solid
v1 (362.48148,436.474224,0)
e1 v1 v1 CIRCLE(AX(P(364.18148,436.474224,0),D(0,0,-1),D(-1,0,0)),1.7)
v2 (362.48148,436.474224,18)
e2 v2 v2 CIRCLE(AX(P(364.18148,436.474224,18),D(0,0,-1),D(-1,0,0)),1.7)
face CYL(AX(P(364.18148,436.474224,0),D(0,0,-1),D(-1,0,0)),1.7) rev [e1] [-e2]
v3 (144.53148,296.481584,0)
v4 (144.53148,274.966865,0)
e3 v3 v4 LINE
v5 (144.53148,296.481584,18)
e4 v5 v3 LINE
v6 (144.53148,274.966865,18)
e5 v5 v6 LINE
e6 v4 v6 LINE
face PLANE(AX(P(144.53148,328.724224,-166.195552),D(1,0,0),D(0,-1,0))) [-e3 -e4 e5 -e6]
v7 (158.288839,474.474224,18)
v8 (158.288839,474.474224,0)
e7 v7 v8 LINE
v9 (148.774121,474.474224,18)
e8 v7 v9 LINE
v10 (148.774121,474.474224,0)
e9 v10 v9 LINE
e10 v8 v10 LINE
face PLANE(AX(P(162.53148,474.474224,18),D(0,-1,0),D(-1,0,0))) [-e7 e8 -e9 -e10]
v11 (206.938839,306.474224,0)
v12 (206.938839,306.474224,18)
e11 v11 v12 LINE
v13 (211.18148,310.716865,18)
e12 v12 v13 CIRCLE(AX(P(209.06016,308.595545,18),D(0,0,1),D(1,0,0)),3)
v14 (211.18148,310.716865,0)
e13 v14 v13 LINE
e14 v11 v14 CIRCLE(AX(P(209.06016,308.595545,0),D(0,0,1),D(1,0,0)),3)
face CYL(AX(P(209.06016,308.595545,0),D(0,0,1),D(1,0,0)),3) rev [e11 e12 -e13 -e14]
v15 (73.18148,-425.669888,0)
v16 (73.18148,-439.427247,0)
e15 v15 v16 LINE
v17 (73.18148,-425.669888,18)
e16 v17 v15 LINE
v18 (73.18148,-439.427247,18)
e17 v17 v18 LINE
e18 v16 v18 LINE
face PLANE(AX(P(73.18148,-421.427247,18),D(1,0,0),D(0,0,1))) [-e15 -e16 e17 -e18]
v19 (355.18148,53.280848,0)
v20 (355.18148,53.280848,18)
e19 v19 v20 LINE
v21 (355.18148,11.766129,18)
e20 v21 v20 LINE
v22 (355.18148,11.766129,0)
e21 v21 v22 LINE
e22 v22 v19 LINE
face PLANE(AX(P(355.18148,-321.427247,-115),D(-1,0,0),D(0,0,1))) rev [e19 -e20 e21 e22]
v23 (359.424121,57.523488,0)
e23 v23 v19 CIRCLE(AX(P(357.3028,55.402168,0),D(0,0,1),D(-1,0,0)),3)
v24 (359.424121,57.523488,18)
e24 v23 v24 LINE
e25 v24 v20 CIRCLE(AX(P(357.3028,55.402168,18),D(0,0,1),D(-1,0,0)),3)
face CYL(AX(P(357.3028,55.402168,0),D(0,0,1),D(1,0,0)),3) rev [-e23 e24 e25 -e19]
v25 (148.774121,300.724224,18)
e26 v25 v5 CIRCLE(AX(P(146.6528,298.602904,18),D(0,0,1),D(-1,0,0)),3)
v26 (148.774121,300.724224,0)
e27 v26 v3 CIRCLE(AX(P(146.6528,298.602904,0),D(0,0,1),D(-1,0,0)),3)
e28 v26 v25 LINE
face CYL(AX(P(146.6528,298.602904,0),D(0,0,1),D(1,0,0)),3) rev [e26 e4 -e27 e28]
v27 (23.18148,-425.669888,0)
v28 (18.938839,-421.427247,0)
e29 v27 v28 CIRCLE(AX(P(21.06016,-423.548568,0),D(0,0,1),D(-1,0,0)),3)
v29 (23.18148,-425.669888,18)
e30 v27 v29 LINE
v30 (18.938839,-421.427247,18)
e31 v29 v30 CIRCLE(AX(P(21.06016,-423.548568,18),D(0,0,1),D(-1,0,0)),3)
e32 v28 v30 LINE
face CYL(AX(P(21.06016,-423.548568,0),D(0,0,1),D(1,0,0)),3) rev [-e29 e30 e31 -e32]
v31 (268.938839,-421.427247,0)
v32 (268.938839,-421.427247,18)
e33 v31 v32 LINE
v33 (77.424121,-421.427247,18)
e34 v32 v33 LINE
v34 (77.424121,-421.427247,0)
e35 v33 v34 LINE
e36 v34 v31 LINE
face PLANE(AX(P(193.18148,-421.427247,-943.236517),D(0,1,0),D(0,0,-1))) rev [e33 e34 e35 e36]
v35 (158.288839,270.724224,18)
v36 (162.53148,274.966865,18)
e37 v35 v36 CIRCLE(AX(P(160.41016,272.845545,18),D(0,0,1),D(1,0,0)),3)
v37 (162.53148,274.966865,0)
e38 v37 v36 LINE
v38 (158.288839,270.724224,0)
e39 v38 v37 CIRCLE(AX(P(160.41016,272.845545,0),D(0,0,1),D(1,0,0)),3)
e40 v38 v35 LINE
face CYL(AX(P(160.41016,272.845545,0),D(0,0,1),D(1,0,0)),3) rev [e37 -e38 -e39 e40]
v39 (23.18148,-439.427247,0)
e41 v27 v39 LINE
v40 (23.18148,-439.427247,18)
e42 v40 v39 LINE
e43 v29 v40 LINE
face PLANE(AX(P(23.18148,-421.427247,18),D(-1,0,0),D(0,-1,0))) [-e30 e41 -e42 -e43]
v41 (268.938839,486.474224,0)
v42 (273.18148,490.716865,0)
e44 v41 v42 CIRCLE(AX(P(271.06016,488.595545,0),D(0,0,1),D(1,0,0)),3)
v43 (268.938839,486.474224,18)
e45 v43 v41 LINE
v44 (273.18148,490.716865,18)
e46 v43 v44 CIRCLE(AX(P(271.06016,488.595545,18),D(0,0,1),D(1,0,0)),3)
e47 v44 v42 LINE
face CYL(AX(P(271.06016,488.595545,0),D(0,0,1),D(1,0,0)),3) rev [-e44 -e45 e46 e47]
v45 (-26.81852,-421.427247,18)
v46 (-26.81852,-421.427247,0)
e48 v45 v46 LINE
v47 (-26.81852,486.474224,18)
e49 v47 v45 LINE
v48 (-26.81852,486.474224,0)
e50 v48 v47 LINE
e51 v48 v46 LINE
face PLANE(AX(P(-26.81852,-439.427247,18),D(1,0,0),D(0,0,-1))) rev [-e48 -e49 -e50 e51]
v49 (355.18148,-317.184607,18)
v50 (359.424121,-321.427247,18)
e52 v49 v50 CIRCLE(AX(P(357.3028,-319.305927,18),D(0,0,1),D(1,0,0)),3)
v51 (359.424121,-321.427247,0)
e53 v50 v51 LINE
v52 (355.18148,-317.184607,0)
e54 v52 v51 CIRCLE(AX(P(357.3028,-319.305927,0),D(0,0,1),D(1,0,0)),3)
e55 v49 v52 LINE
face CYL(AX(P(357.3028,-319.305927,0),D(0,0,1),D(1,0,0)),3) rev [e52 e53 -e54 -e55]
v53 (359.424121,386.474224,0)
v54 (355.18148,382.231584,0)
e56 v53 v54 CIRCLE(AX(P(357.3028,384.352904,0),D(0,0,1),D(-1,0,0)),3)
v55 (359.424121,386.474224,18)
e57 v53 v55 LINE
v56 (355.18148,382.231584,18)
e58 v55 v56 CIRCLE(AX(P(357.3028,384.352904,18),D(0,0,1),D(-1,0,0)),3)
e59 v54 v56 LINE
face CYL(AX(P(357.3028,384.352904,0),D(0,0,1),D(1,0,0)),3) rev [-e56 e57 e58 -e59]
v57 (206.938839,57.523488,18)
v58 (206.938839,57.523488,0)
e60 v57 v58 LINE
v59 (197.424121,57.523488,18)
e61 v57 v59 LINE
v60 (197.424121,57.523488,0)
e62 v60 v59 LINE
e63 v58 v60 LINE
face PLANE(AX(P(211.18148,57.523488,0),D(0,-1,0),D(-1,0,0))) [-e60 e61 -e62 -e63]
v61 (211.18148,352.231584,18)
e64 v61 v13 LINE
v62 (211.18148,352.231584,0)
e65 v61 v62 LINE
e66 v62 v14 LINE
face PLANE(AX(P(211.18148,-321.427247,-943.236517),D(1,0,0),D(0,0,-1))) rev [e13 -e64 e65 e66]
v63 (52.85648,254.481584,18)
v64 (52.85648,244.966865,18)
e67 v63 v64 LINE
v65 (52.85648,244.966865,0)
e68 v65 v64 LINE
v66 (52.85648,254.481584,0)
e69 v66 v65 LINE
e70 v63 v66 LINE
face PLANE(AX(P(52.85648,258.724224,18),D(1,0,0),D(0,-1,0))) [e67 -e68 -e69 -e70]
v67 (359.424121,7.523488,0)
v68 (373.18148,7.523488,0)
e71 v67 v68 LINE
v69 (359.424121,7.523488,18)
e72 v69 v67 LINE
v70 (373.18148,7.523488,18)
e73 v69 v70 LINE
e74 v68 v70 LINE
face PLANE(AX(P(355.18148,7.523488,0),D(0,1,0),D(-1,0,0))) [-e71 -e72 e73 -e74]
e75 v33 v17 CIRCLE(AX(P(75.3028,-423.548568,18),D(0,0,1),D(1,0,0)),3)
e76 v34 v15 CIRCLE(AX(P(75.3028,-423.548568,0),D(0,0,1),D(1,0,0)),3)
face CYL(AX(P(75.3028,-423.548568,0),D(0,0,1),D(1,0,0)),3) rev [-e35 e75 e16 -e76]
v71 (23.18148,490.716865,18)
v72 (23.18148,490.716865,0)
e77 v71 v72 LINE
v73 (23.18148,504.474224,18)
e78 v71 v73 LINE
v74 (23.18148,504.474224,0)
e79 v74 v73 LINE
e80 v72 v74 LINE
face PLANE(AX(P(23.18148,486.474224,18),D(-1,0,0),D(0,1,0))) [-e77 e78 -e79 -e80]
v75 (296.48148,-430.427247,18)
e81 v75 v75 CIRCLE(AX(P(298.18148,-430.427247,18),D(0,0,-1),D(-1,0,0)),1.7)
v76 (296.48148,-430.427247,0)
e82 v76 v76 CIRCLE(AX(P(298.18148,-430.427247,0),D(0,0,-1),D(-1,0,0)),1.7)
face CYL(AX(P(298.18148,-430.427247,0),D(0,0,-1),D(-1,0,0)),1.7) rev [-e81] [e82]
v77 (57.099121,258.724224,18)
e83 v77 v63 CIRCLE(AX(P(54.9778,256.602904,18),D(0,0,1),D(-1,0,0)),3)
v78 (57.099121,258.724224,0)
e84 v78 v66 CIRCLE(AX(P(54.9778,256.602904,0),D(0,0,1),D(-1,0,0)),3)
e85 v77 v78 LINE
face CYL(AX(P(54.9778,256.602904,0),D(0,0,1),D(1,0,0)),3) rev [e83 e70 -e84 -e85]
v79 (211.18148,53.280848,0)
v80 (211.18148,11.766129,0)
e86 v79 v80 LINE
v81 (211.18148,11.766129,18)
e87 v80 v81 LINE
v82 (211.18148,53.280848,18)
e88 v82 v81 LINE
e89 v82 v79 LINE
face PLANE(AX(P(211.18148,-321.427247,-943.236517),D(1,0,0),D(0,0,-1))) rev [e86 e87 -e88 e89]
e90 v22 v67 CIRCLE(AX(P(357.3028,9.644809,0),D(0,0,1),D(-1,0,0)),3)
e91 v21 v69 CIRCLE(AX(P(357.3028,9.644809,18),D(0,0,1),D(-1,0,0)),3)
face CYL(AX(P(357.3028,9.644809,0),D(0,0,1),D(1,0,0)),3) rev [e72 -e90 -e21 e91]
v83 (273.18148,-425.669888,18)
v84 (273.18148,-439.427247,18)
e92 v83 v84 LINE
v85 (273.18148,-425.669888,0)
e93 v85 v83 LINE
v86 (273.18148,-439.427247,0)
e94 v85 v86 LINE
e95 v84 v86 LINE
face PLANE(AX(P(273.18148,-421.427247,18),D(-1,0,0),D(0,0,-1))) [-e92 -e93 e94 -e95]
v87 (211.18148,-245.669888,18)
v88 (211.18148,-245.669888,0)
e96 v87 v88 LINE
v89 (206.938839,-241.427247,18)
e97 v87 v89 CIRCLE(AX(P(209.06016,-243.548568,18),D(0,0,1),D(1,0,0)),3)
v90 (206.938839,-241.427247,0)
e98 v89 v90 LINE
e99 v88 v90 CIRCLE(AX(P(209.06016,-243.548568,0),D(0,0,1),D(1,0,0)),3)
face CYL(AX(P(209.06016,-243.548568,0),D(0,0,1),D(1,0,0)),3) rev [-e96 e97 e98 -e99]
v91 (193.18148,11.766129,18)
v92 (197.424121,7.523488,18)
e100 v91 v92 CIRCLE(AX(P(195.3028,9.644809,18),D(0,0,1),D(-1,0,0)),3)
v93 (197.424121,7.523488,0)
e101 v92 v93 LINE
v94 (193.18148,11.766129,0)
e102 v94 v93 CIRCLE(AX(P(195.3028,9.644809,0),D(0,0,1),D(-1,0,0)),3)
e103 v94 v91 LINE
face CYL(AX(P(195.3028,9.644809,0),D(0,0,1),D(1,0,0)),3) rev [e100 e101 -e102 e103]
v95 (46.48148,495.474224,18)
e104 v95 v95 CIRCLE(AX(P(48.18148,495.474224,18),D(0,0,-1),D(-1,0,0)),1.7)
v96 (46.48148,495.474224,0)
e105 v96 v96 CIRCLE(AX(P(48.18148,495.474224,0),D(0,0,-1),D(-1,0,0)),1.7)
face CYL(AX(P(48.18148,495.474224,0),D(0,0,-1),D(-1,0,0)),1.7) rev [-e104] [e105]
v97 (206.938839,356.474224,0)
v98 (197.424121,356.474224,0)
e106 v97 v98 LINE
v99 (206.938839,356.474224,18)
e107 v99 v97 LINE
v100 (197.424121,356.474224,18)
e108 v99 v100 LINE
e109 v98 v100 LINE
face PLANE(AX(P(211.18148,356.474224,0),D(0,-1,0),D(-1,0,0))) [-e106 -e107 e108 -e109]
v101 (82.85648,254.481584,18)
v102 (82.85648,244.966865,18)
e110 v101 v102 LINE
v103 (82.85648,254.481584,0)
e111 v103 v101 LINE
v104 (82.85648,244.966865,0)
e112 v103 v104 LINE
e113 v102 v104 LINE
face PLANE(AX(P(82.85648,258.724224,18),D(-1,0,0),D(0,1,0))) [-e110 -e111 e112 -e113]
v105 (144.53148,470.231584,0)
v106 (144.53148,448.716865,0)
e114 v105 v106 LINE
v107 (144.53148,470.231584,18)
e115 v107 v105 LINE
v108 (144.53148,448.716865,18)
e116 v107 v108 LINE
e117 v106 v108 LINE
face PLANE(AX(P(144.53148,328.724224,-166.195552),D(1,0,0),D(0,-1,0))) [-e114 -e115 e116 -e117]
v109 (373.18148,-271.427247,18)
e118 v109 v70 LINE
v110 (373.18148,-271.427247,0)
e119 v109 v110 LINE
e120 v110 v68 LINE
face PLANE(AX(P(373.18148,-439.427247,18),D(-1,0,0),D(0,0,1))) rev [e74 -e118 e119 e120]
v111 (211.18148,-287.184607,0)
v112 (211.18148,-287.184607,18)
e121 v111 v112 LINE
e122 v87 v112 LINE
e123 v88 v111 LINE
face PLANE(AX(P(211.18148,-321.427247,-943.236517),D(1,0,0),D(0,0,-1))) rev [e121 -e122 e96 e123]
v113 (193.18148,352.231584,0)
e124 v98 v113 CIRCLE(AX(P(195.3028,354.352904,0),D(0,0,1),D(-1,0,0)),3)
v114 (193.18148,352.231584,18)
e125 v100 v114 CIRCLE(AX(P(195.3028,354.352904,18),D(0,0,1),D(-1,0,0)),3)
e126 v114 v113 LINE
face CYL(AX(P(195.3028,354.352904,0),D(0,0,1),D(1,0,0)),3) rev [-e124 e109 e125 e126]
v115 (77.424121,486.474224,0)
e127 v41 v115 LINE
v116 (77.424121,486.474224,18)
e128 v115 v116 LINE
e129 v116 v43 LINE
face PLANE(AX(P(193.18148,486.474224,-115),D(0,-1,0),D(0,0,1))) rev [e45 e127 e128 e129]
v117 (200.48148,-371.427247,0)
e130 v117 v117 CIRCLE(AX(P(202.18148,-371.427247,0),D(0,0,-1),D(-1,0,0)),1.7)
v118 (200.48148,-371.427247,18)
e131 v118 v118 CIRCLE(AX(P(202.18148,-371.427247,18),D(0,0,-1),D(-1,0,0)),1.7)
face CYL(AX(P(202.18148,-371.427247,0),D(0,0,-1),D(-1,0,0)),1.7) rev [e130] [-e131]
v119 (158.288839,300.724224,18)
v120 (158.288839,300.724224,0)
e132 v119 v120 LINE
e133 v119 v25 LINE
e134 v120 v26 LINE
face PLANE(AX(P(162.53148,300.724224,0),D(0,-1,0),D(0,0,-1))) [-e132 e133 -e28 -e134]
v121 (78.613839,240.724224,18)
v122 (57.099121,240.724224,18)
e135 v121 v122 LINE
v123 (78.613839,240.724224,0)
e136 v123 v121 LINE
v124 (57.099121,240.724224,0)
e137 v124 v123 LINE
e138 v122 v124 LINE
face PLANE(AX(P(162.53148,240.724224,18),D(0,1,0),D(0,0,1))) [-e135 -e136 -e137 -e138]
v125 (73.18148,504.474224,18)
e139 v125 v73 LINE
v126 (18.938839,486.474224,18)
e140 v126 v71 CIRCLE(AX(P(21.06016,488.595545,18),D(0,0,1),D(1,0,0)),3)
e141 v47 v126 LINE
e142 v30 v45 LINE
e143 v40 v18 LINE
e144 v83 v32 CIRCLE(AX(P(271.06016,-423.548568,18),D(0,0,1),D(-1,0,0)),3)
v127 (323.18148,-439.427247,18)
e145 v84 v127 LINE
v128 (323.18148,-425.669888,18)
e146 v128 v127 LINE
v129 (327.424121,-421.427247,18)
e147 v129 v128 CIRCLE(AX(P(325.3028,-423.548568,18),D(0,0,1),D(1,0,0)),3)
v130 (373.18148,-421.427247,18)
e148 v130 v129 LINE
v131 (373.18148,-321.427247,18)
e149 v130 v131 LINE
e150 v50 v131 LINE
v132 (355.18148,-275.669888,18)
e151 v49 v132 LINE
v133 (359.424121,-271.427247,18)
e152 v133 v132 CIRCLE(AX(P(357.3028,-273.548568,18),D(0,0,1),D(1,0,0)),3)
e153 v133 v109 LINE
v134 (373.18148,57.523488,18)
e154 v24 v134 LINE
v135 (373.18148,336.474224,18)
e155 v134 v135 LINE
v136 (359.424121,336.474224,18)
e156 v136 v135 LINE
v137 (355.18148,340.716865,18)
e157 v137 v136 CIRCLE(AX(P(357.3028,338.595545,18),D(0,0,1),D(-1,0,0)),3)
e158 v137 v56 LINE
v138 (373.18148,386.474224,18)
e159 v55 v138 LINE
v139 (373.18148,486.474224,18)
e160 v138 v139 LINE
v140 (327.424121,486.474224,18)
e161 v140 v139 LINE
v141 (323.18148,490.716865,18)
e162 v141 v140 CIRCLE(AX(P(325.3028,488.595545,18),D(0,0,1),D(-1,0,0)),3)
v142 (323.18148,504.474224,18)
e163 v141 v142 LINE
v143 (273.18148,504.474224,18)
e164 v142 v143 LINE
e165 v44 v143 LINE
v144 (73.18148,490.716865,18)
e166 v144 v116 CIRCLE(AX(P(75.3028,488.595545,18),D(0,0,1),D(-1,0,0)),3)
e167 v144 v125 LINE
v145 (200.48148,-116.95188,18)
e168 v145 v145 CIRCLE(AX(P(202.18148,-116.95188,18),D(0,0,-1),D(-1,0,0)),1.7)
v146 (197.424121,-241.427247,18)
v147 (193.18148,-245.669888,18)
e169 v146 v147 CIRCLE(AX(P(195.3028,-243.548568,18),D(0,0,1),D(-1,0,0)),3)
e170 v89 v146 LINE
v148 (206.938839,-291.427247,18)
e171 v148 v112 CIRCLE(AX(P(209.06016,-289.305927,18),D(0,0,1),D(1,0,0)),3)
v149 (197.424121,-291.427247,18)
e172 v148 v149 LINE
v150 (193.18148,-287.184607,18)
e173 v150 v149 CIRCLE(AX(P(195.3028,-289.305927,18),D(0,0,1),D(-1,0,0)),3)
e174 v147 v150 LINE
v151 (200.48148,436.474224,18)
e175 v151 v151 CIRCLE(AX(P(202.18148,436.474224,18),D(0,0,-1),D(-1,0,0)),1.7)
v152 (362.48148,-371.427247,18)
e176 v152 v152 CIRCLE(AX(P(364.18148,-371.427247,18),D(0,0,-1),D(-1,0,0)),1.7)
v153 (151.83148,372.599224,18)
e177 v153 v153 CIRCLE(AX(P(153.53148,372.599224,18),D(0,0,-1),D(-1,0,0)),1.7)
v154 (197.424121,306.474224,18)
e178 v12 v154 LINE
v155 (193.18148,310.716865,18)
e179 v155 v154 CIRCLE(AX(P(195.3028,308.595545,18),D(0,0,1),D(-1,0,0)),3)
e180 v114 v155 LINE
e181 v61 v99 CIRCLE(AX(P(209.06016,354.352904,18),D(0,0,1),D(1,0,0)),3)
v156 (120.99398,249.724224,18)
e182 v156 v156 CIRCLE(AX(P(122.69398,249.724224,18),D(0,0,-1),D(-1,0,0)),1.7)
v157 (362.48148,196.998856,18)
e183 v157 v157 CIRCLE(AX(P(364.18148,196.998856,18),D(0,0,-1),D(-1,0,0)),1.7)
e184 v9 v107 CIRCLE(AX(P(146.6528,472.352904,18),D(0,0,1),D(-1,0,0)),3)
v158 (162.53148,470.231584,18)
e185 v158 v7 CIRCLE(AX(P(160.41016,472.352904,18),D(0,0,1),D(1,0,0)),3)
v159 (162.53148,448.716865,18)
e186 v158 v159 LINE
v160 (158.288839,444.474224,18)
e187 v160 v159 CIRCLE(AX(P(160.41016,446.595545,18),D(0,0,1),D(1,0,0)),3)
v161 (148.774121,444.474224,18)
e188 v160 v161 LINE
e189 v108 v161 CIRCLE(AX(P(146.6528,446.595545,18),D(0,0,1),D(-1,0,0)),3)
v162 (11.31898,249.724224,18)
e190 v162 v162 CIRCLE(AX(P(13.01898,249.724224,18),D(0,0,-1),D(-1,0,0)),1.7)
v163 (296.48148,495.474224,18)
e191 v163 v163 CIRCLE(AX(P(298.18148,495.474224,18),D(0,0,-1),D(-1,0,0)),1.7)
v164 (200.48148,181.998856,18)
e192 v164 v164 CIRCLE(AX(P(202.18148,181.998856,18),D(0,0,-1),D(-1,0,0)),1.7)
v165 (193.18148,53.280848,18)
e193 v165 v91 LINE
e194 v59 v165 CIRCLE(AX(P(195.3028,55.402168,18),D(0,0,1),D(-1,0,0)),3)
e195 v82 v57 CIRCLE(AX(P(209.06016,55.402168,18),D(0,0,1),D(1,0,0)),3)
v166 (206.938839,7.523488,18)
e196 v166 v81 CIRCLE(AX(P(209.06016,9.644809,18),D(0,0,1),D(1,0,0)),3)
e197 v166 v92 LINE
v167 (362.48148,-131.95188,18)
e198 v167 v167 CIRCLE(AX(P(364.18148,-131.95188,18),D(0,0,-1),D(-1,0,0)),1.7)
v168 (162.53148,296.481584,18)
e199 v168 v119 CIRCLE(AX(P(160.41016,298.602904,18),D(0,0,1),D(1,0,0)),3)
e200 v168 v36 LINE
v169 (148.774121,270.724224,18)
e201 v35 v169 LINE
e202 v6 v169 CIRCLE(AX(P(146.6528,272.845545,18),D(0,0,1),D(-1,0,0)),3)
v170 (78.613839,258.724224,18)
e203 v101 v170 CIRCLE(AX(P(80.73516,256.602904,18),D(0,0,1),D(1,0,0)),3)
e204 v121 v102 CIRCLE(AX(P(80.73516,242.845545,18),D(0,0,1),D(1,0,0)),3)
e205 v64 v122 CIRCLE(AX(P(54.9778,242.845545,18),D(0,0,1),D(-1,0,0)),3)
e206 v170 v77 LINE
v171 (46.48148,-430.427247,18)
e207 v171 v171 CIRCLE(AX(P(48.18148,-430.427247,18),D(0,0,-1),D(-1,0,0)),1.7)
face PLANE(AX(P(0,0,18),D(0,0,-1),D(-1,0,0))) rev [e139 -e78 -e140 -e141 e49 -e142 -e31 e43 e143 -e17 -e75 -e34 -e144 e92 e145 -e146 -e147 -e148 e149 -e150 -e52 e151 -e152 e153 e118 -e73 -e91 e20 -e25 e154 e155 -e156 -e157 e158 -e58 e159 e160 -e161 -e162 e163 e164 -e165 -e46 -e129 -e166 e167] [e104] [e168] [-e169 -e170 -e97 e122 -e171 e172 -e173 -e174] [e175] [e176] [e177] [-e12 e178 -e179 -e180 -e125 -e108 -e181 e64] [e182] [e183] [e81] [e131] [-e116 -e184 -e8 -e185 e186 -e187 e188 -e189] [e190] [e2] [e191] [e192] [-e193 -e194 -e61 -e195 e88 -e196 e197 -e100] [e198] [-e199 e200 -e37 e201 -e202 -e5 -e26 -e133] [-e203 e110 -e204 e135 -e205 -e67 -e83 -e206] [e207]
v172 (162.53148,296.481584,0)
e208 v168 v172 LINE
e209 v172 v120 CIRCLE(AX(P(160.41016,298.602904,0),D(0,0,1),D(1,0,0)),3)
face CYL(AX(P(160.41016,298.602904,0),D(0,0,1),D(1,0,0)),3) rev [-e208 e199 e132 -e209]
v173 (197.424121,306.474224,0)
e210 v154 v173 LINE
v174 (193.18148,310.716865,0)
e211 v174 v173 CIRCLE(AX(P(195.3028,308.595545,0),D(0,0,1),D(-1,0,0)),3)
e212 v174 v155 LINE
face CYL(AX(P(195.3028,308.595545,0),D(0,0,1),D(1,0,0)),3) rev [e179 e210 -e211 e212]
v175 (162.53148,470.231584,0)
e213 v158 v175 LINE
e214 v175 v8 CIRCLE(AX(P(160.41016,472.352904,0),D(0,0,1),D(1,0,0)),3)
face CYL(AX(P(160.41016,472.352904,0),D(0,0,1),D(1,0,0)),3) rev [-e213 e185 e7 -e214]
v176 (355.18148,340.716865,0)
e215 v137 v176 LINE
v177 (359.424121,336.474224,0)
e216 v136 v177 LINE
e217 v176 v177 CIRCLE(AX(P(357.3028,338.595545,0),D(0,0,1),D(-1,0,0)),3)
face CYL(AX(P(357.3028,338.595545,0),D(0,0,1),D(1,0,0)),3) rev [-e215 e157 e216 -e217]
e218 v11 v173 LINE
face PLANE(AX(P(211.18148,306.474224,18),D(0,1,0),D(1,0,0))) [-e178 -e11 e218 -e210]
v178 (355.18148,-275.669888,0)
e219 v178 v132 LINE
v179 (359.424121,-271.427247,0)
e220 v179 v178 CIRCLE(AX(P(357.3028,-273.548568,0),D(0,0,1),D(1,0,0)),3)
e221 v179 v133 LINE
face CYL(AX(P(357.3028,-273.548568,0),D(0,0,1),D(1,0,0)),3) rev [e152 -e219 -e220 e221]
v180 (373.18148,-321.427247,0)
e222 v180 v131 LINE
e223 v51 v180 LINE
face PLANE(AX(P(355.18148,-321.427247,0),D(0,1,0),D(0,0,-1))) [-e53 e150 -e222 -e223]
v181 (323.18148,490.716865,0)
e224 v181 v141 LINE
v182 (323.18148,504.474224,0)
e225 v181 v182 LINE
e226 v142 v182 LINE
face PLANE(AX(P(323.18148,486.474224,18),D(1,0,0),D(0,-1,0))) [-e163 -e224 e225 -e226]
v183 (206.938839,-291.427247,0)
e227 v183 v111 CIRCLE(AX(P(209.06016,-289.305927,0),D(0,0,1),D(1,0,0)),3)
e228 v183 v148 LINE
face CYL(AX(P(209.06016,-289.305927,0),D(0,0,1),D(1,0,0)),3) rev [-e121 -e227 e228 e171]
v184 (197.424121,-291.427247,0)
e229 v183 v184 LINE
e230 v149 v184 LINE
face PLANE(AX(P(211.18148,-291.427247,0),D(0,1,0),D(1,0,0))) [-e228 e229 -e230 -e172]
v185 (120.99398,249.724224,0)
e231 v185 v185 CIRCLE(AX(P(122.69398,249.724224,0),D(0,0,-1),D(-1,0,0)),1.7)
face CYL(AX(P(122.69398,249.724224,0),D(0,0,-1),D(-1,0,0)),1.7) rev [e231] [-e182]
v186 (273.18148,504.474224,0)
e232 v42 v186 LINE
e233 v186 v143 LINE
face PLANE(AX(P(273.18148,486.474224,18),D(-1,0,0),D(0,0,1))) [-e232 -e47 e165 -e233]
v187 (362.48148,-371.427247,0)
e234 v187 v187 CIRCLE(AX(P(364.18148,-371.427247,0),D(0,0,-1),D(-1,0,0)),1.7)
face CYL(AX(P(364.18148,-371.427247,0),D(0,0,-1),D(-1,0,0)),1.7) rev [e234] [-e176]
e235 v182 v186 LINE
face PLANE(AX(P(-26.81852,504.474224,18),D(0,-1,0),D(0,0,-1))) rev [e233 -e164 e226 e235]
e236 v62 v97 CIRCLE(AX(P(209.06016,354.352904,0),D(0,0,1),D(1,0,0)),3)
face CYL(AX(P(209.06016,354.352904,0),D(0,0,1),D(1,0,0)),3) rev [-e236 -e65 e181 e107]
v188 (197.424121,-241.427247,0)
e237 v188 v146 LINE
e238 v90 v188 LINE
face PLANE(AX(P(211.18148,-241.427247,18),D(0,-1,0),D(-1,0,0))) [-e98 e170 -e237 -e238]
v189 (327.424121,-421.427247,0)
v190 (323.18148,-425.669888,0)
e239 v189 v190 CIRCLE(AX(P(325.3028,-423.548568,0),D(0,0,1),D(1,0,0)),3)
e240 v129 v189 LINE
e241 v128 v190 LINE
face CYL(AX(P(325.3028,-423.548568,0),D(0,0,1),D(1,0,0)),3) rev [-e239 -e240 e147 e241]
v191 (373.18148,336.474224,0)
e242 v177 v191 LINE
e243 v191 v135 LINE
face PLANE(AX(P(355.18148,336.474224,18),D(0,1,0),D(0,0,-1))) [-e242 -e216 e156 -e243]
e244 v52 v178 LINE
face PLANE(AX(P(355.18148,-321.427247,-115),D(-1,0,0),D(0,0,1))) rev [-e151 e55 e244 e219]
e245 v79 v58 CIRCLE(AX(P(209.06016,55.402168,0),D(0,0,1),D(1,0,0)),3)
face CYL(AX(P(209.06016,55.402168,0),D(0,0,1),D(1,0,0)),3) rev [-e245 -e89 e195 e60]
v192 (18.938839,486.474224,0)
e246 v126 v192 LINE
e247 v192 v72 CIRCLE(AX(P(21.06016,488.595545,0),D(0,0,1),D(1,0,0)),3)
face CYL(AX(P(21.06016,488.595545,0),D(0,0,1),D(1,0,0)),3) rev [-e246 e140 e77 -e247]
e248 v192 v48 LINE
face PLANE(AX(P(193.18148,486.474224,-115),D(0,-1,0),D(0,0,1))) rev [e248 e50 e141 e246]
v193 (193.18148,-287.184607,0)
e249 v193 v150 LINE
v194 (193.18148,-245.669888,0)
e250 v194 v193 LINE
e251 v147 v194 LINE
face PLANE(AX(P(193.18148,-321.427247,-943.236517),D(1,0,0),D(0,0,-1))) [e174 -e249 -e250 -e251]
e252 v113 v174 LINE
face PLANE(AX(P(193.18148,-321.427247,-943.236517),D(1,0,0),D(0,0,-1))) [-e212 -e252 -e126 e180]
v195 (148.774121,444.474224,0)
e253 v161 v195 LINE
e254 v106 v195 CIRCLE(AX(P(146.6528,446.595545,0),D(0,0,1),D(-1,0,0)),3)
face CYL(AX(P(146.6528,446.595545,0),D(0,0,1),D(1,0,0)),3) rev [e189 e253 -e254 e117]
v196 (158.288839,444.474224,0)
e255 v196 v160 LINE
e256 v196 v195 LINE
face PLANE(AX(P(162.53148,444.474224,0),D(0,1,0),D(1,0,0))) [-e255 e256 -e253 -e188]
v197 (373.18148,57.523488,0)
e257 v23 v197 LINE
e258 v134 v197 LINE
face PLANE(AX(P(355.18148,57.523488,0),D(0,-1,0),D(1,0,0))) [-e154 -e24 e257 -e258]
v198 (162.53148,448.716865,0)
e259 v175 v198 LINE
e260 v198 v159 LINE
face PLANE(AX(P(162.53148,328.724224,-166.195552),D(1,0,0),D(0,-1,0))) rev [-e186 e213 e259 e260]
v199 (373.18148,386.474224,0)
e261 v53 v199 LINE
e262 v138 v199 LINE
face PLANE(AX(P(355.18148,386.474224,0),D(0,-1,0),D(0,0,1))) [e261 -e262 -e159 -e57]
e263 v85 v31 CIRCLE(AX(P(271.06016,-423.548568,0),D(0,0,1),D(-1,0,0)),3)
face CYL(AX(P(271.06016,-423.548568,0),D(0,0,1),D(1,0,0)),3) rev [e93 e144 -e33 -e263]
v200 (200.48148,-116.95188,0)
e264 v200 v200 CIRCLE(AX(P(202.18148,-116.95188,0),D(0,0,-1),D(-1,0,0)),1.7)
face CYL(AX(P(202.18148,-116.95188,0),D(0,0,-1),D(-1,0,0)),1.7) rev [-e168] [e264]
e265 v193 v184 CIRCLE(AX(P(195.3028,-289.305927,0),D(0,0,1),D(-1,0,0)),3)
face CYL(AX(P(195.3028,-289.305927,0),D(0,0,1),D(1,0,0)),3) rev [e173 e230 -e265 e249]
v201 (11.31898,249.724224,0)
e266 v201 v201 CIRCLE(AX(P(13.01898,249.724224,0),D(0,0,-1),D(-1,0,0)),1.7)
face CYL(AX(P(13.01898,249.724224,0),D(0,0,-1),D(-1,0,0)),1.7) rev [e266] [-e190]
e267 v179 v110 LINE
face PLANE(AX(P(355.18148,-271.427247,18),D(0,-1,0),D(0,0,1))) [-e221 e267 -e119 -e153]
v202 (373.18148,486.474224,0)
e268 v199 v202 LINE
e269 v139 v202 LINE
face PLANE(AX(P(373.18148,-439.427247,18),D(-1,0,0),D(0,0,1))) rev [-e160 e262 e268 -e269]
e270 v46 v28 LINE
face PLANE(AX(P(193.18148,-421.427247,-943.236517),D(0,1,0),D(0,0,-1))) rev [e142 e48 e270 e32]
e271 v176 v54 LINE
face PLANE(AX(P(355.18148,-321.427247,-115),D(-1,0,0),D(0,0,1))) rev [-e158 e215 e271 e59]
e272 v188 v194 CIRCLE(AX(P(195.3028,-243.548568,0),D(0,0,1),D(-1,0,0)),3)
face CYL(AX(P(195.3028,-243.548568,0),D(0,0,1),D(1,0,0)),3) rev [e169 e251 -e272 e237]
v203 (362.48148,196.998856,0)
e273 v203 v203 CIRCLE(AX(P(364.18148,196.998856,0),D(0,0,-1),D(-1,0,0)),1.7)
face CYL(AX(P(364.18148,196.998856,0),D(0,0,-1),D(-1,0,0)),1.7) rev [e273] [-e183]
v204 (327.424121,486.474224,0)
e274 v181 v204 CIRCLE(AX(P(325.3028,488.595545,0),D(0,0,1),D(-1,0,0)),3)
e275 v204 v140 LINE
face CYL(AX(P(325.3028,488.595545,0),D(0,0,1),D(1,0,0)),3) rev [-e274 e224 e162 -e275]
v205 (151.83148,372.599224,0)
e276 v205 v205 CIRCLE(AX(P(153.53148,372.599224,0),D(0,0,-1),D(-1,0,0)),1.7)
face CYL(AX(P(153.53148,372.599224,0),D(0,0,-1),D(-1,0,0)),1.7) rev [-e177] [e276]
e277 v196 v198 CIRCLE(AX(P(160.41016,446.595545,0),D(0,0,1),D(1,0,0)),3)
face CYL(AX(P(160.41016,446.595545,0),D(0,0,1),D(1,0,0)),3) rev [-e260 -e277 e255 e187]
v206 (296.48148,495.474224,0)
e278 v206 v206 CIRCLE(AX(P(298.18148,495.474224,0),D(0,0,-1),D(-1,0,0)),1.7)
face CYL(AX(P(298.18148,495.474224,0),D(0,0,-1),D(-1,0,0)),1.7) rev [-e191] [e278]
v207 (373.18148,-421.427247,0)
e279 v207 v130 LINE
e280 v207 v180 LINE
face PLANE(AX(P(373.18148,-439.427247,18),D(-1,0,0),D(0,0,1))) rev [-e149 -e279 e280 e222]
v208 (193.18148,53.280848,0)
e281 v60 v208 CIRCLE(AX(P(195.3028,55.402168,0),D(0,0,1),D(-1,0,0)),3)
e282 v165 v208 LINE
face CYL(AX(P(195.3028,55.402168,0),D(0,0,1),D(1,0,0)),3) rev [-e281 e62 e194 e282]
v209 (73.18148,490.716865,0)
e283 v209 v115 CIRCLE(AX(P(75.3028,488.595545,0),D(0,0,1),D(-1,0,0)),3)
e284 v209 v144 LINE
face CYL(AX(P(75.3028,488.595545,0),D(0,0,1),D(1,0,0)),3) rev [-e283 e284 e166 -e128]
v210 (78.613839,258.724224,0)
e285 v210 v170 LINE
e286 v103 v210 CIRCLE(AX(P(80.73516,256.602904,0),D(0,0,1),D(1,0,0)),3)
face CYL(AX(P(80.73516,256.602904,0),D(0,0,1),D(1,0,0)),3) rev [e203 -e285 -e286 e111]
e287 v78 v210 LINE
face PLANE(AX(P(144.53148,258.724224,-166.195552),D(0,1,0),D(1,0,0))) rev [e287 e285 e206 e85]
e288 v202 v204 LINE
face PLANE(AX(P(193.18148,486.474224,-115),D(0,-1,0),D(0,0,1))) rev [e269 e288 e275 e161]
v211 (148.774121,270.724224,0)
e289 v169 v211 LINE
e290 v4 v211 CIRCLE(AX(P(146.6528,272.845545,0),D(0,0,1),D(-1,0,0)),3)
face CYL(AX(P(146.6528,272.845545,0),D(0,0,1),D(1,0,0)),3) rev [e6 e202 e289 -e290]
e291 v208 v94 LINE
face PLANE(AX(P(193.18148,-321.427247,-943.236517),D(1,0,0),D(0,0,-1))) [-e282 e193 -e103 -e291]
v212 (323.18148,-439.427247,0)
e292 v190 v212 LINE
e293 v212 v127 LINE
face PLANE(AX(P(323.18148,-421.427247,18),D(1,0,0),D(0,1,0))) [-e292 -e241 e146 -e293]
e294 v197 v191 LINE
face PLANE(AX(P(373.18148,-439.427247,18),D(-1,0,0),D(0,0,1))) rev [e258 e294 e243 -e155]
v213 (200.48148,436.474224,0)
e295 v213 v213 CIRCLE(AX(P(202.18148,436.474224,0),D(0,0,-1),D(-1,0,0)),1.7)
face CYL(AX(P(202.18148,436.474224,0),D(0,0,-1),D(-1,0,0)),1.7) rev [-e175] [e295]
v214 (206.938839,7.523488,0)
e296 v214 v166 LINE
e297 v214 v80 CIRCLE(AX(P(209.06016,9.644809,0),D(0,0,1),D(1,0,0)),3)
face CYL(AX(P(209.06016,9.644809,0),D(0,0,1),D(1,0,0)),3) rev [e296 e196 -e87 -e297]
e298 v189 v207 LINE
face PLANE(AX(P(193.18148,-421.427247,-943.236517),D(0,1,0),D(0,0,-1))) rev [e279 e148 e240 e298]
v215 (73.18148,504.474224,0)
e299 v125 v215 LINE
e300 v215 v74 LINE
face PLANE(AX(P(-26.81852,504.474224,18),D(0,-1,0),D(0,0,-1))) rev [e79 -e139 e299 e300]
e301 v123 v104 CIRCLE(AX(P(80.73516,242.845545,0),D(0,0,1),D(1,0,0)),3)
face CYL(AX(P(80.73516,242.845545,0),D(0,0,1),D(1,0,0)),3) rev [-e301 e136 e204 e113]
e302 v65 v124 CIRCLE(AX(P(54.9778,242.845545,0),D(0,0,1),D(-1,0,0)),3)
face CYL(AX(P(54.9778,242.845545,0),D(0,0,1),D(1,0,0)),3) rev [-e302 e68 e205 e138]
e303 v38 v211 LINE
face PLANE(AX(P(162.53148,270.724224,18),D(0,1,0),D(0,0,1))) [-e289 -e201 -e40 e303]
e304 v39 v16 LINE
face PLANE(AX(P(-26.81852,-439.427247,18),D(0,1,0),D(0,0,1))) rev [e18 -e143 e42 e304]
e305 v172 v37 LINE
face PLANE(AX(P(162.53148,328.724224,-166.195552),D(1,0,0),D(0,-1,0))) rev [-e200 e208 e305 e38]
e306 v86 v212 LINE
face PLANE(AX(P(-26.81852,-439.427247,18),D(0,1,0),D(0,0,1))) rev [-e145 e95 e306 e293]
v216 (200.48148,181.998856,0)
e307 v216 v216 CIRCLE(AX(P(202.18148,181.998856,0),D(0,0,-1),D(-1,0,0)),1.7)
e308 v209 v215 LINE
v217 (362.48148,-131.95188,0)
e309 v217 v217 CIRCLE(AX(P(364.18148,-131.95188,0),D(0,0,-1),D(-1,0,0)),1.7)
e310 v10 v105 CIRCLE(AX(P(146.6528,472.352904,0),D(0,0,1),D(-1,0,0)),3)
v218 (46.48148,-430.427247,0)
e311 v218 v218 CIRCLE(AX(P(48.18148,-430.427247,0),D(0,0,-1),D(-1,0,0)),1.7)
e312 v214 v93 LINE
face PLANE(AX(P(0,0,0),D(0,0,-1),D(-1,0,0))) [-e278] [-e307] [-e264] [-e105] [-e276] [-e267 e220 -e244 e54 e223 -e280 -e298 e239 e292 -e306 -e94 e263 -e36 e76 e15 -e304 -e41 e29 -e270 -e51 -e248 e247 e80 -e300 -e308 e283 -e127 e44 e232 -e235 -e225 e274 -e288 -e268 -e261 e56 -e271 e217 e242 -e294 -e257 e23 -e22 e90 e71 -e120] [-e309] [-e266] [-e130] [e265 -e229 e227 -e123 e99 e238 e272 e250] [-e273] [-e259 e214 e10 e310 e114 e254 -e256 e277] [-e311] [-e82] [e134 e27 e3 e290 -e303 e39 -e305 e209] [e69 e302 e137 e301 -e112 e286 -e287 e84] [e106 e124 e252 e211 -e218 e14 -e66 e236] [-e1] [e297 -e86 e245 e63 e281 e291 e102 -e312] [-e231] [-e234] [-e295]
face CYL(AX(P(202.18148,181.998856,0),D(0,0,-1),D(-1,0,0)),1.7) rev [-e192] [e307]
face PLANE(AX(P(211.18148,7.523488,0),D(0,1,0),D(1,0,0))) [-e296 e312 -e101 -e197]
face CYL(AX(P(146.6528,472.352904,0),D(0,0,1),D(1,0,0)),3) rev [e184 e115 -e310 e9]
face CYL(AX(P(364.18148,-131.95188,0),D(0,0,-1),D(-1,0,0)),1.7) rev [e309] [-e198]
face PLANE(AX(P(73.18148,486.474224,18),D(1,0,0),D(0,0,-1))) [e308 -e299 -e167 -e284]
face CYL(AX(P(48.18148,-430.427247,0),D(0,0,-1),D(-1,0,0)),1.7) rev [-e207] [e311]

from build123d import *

# Parameters (mm, degrees)
SKETCH1_W             = 400
SKETCH1_H             = 943.901471862
BOSS_EXTRUDE1_DEPTH   = 18
CAVITY1_START         = -439.427247466
CAVITY1_OUTLINE_W     = 50
CAVITY1_OUTLINE_H     = 18
CAVITY1_OUTLINE_W_2   = 200
CAVITY1_DEPTH         = 18
CAVITY1_START_2       = 486.474224396
CAVITY1_2_OUTLINE_W   = 50
CAVITY1_2_OUTLINE_H   = 18
CAVITY1_2_OUTLINE_W_2 = 200
CAVITY1_2_DEPTH       = 18
CAVITY1_START_3       = 7.523488465
CAVITY1_3_OUTLINE_W   = 18
CAVITY1_3_OUTLINE_H   = 18
CAVITY1_3_DEPTH       = 50
CAVITY1_START_4       = -321.427247466
CAVITY1_4_OUTLINE_W   = 18
CAVITY1_4_OUTLINE_H   = 18
CAVITY1_4_DEPTH       = 50
CAVITY1_START_5       = -291.427247466
CAVITY1_5_OUTLINE_W   = 18
CAVITY1_5_OUTLINE_H   = 18
CAVITY1_5_DEPTH       = 50
CAVITY1_START_6       = 306.474224396
CAVITY1_6_OUTLINE_W   = 18
CAVITY1_6_OUTLINE_H   = 18
CAVITY1_6_DEPTH       = 50
CAVITY1_START_7       = 336.474224396
CAVITY1_7_OUTLINE_W   = 18
CAVITY1_7_OUTLINE_H   = 18
CAVITY1_7_DEPTH       = 50
CAVITY1_START_8       = 240.724224396
CAVITY1_8_OUTLINE_W   = 30
CAVITY1_8_OUTLINE_H   = 18
CAVITY1_8_DEPTH       = 18
CAVITY1_START_9       = 270.724224396
CAVITY1_9_OUTLINE_W   = 18
CAVITY1_9_OUTLINE_H   = 18
CAVITY1_9_DEPTH       = 30
CAVITY1_START_10      = 444.474224396
CAVITY1_10_OUTLINE_W  = 18
CAVITY1_10_OUTLINE_H  = 18
CAVITY1_10_DEPTH      = 30
SKETCH3_R             = 3
CUT_EXTRUDE1_DEPTH    = 18
M3_CLEARANCE_HOLE1_D  = 3.4


# Read off the part's stored shape, not the designer's step: Cavity1
with BuildPart() as part:
    # Sketch1 → Boss-Extrude1 (new body)
    with BuildSketch(Plane.XY):
        with Locations((173.181479905, 32.523488465)):
            Rectangle(SKETCH1_W, SKETCH1_H)
    extrude(amount=BOSS_EXTRUDE1_DEPTH)

    # Cavity1 outline → Cavity1 (cut)
    with BuildSketch(Plane(origin=(0, 0, 0), x_dir=(1, 0, 0), z_dir=(0, 1, 0)).offset(CAVITY1_START)):
        with Locations((-1.818520095, -9)):
            Rectangle(CAVITY1_OUTLINE_W, CAVITY1_OUTLINE_H)
        with Locations((173.181479905, -9)):
            Rectangle(CAVITY1_OUTLINE_W_2, CAVITY1_OUTLINE_H)
        with Locations((348.181479905, -9)):
            Rectangle(CAVITY1_OUTLINE_W, CAVITY1_OUTLINE_H)
    extrude(amount=CAVITY1_DEPTH, mode=Mode.SUBTRACT)

    # Cavity1 2 outline → Cavity1 2 (cut)
    with BuildSketch(Plane(origin=(0, 0, 0), x_dir=(1, 0, 0), z_dir=(0, 1, 0)).offset(CAVITY1_START_2)):
        with Locations((-1.818520095, -9)):
            Rectangle(CAVITY1_2_OUTLINE_W, CAVITY1_2_OUTLINE_H)
        with Locations((173.181479905, -9)):
            Rectangle(CAVITY1_2_OUTLINE_W_2, CAVITY1_2_OUTLINE_H)
        with Locations((348.181479905, -9)):
            Rectangle(CAVITY1_2_OUTLINE_W, CAVITY1_2_OUTLINE_H)
    extrude(amount=CAVITY1_2_DEPTH, mode=Mode.SUBTRACT)

    # Cavity1 3 outline → Cavity1 3 (cut)
    with BuildSketch(Plane(origin=(0, 0, 0), x_dir=(1, 0, 0), z_dir=(0, 1, 0)).offset(CAVITY1_START_3)):
        with Locations((202.181479905, -9)):
            Rectangle(CAVITY1_3_OUTLINE_W, CAVITY1_3_OUTLINE_H)
        with Locations((364.181479905, -9)):
            Rectangle(CAVITY1_3_OUTLINE_W, CAVITY1_3_OUTLINE_H)
    extrude(amount=CAVITY1_3_DEPTH, mode=Mode.SUBTRACT)

    # Cavity1 4 outline → Cavity1 4 (cut)
    with BuildSketch(Plane(origin=(0, 0, 0), x_dir=(1, 0, 0), z_dir=(0, 1, 0)).offset(CAVITY1_START_4)):
        with Locations((364.181479905, -9)):
            Rectangle(CAVITY1_4_OUTLINE_W, CAVITY1_4_OUTLINE_H)
    extrude(amount=CAVITY1_4_DEPTH, mode=Mode.SUBTRACT)

    # Cavity1 5 outline → Cavity1 5 (cut)
    with BuildSketch(Plane(origin=(0, 0, 0), x_dir=(1, 0, 0), z_dir=(0, 1, 0)).offset(CAVITY1_START_5)):
        with Locations((202.181479905, -9)):
            Rectangle(CAVITY1_5_OUTLINE_W, CAVITY1_5_OUTLINE_H)
    extrude(amount=CAVITY1_5_DEPTH, mode=Mode.SUBTRACT)

    # Cavity1 6 outline → Cavity1 6 (cut)
    with BuildSketch(Plane(origin=(0, 0, 0), x_dir=(1, 0, 0), z_dir=(0, 1, 0)).offset(CAVITY1_START_6)):
        with Locations((202.181479905, -9)):
            Rectangle(CAVITY1_6_OUTLINE_W, CAVITY1_6_OUTLINE_H)
    extrude(amount=CAVITY1_6_DEPTH, mode=Mode.SUBTRACT)

    # Cavity1 7 outline → Cavity1 7 (cut)
    with BuildSketch(Plane(origin=(0, 0, 0), x_dir=(1, 0, 0), z_dir=(0, 1, 0)).offset(CAVITY1_START_7)):
        with Locations((364.181479905, -9)):
            Rectangle(CAVITY1_7_OUTLINE_W, CAVITY1_7_OUTLINE_H)
    extrude(amount=CAVITY1_7_DEPTH, mode=Mode.SUBTRACT)

    # Cavity1 8 outline → Cavity1 8 (cut)
    with BuildSketch(Plane(origin=(0, 0, 0), x_dir=(1, 0, 0), z_dir=(0, 1, 0)).offset(CAVITY1_START_8)):
        with Locations((67.856479905, -9)):
            Rectangle(CAVITY1_8_OUTLINE_W, CAVITY1_8_OUTLINE_H)
    extrude(amount=CAVITY1_8_DEPTH, mode=Mode.SUBTRACT)

    # Cavity1 9 outline → Cavity1 9 (cut)
    with BuildSketch(Plane(origin=(0, 0, 0), x_dir=(1, 0, 0), z_dir=(0, 1, 0)).offset(CAVITY1_START_9)):
        with Locations((153.531479905, -9)):
            Rectangle(CAVITY1_9_OUTLINE_W, CAVITY1_9_OUTLINE_H)
    extrude(amount=CAVITY1_9_DEPTH, mode=Mode.SUBTRACT)

    # Cavity1 10 outline → Cavity1 10 (cut)
    with BuildSketch(Plane(origin=(0, 0, 0), x_dir=(1, 0, 0), z_dir=(0, 1, 0)).offset(CAVITY1_START_10)):
        with Locations((153.531479905, -9)):
            Rectangle(CAVITY1_10_OUTLINE_W, CAVITY1_10_OUTLINE_H)
    extrude(amount=CAVITY1_10_DEPTH, mode=Mode.SUBTRACT)

    # Sketch3 → Cut-Extrude1 (cut)
    with BuildSketch(Plane.XY.offset(18)):
        with Locations((357.302800248, -273.54856781)):
            Circle(SKETCH3_R)
        with Locations((357.302800248, -319.305927123)):
            Circle(SKETCH3_R)
        with Locations((357.302800248, 384.352904053)):
            Circle(SKETCH3_R)
        with Locations((357.302800248, 338.59554474)):
            Circle(SKETCH3_R)
        with Locations((357.302800248, 55.402168121)):
            Circle(SKETCH3_R)
        with Locations((357.302800248, 9.644808808)):
            Circle(SKETCH3_R)
        with Locations((195.302800248, 354.352904053)):
            Circle(SKETCH3_R)
        with Locations((195.302800248, 308.59554474)):
            Circle(SKETCH3_R)
        with Locations((195.302800248, 55.402168121)):
            Circle(SKETCH3_R)
        with Locations((195.302800248, 9.644808808)):
            Circle(SKETCH3_R)
        with Locations((195.302800248, -243.54856781)):
            Circle(SKETCH3_R)
        with Locations((195.302800248, -289.305927123)):
            Circle(SKETCH3_R)
        with Locations((209.060159561, -289.305927123)):
            Circle(SKETCH3_R)
        with Locations((209.060159561, -243.54856781)):
            Circle(SKETCH3_R)
        with Locations((209.060159561, 9.644808808)):
            Circle(SKETCH3_R)
        with Locations((209.060159561, 55.402168121)):
            Circle(SKETCH3_R)
        with Locations((209.060159561, 308.59554474)):
            Circle(SKETCH3_R)
        with Locations((209.060159561, 354.352904053)):
            Circle(SKETCH3_R)
        with Locations((146.652800248, 472.352904053)):
            Circle(SKETCH3_R)
        with Locations((160.410159561, 472.352904053)):
            Circle(SKETCH3_R)
        with Locations((146.652800248, 446.59554474)):
            Circle(SKETCH3_R)
        with Locations((160.410159561, 446.59554474)):
            Circle(SKETCH3_R)
        with Locations((146.652800248, 298.602904053)):
            Circle(SKETCH3_R)
        with Locations((160.410159561, 298.602904053)):
            Circle(SKETCH3_R)
        with Locations((146.652800248, 272.84554474)):
            Circle(SKETCH3_R)
        with Locations((160.410159561, 272.84554474)):
            Circle(SKETCH3_R)
        with Locations((54.977800248, 256.602904053)):
            Circle(SKETCH3_R)
        with Locations((80.735159561, 256.602904053)):
            Circle(SKETCH3_R)
        with Locations((54.977800248, 242.84554474)):
            Circle(SKETCH3_R)
        with Locations((80.735159561, 242.84554474)):
            Circle(SKETCH3_R)
        with Locations((325.302800248, 488.59554474)):
            Circle(SKETCH3_R)
        with Locations((271.060159561, 488.59554474)):
            Circle(SKETCH3_R)
        with Locations((75.302800248, 488.59554474)):
            Circle(SKETCH3_R)
        with Locations((21.060159561, 488.59554474)):
            Circle(SKETCH3_R)
        with Locations((21.060159561, -423.54856781)):
            Circle(SKETCH3_R)
        with Locations((75.302800248, -423.54856781)):
            Circle(SKETCH3_R)
        with Locations((271.060159561, -423.54856781)):
            Circle(SKETCH3_R)
        with Locations((325.302800248, -423.54856781)):
            Circle(SKETCH3_R)
    extrude(amount=-CUT_EXTRUDE1_DEPTH, mode=Mode.SUBTRACT)

    # M3 Clearance Hole1 (through all)
    with Locations(Plane(origin=(0, 0, 0), x_dir=(-1, 0, 0), z_dir=(0, 0, -1))):
        with Locations((-48.181479905, 495.474224396), (-298.181479905, 495.474224396), (-298.181479905, -430.427247466), (-48.181479905, -430.427247466), (-153.531479905, 372.599224396), (-13.018979905, 249.724224396), (-122.693979905, 249.724224396), (-364.181479905, 436.474224396), (-364.181479905, 196.99885643), (-364.181479905, -131.951879501), (-364.181479905, -371.427247466), (-202.181479905, -371.427247466), (-202.181479905, -116.951879501), (-202.181479905, 181.99885643), (-202.181479905, 436.474224396)):
            Hole(M3_CLEARANCE_HOLE1_D / 2)


solid = part.part
